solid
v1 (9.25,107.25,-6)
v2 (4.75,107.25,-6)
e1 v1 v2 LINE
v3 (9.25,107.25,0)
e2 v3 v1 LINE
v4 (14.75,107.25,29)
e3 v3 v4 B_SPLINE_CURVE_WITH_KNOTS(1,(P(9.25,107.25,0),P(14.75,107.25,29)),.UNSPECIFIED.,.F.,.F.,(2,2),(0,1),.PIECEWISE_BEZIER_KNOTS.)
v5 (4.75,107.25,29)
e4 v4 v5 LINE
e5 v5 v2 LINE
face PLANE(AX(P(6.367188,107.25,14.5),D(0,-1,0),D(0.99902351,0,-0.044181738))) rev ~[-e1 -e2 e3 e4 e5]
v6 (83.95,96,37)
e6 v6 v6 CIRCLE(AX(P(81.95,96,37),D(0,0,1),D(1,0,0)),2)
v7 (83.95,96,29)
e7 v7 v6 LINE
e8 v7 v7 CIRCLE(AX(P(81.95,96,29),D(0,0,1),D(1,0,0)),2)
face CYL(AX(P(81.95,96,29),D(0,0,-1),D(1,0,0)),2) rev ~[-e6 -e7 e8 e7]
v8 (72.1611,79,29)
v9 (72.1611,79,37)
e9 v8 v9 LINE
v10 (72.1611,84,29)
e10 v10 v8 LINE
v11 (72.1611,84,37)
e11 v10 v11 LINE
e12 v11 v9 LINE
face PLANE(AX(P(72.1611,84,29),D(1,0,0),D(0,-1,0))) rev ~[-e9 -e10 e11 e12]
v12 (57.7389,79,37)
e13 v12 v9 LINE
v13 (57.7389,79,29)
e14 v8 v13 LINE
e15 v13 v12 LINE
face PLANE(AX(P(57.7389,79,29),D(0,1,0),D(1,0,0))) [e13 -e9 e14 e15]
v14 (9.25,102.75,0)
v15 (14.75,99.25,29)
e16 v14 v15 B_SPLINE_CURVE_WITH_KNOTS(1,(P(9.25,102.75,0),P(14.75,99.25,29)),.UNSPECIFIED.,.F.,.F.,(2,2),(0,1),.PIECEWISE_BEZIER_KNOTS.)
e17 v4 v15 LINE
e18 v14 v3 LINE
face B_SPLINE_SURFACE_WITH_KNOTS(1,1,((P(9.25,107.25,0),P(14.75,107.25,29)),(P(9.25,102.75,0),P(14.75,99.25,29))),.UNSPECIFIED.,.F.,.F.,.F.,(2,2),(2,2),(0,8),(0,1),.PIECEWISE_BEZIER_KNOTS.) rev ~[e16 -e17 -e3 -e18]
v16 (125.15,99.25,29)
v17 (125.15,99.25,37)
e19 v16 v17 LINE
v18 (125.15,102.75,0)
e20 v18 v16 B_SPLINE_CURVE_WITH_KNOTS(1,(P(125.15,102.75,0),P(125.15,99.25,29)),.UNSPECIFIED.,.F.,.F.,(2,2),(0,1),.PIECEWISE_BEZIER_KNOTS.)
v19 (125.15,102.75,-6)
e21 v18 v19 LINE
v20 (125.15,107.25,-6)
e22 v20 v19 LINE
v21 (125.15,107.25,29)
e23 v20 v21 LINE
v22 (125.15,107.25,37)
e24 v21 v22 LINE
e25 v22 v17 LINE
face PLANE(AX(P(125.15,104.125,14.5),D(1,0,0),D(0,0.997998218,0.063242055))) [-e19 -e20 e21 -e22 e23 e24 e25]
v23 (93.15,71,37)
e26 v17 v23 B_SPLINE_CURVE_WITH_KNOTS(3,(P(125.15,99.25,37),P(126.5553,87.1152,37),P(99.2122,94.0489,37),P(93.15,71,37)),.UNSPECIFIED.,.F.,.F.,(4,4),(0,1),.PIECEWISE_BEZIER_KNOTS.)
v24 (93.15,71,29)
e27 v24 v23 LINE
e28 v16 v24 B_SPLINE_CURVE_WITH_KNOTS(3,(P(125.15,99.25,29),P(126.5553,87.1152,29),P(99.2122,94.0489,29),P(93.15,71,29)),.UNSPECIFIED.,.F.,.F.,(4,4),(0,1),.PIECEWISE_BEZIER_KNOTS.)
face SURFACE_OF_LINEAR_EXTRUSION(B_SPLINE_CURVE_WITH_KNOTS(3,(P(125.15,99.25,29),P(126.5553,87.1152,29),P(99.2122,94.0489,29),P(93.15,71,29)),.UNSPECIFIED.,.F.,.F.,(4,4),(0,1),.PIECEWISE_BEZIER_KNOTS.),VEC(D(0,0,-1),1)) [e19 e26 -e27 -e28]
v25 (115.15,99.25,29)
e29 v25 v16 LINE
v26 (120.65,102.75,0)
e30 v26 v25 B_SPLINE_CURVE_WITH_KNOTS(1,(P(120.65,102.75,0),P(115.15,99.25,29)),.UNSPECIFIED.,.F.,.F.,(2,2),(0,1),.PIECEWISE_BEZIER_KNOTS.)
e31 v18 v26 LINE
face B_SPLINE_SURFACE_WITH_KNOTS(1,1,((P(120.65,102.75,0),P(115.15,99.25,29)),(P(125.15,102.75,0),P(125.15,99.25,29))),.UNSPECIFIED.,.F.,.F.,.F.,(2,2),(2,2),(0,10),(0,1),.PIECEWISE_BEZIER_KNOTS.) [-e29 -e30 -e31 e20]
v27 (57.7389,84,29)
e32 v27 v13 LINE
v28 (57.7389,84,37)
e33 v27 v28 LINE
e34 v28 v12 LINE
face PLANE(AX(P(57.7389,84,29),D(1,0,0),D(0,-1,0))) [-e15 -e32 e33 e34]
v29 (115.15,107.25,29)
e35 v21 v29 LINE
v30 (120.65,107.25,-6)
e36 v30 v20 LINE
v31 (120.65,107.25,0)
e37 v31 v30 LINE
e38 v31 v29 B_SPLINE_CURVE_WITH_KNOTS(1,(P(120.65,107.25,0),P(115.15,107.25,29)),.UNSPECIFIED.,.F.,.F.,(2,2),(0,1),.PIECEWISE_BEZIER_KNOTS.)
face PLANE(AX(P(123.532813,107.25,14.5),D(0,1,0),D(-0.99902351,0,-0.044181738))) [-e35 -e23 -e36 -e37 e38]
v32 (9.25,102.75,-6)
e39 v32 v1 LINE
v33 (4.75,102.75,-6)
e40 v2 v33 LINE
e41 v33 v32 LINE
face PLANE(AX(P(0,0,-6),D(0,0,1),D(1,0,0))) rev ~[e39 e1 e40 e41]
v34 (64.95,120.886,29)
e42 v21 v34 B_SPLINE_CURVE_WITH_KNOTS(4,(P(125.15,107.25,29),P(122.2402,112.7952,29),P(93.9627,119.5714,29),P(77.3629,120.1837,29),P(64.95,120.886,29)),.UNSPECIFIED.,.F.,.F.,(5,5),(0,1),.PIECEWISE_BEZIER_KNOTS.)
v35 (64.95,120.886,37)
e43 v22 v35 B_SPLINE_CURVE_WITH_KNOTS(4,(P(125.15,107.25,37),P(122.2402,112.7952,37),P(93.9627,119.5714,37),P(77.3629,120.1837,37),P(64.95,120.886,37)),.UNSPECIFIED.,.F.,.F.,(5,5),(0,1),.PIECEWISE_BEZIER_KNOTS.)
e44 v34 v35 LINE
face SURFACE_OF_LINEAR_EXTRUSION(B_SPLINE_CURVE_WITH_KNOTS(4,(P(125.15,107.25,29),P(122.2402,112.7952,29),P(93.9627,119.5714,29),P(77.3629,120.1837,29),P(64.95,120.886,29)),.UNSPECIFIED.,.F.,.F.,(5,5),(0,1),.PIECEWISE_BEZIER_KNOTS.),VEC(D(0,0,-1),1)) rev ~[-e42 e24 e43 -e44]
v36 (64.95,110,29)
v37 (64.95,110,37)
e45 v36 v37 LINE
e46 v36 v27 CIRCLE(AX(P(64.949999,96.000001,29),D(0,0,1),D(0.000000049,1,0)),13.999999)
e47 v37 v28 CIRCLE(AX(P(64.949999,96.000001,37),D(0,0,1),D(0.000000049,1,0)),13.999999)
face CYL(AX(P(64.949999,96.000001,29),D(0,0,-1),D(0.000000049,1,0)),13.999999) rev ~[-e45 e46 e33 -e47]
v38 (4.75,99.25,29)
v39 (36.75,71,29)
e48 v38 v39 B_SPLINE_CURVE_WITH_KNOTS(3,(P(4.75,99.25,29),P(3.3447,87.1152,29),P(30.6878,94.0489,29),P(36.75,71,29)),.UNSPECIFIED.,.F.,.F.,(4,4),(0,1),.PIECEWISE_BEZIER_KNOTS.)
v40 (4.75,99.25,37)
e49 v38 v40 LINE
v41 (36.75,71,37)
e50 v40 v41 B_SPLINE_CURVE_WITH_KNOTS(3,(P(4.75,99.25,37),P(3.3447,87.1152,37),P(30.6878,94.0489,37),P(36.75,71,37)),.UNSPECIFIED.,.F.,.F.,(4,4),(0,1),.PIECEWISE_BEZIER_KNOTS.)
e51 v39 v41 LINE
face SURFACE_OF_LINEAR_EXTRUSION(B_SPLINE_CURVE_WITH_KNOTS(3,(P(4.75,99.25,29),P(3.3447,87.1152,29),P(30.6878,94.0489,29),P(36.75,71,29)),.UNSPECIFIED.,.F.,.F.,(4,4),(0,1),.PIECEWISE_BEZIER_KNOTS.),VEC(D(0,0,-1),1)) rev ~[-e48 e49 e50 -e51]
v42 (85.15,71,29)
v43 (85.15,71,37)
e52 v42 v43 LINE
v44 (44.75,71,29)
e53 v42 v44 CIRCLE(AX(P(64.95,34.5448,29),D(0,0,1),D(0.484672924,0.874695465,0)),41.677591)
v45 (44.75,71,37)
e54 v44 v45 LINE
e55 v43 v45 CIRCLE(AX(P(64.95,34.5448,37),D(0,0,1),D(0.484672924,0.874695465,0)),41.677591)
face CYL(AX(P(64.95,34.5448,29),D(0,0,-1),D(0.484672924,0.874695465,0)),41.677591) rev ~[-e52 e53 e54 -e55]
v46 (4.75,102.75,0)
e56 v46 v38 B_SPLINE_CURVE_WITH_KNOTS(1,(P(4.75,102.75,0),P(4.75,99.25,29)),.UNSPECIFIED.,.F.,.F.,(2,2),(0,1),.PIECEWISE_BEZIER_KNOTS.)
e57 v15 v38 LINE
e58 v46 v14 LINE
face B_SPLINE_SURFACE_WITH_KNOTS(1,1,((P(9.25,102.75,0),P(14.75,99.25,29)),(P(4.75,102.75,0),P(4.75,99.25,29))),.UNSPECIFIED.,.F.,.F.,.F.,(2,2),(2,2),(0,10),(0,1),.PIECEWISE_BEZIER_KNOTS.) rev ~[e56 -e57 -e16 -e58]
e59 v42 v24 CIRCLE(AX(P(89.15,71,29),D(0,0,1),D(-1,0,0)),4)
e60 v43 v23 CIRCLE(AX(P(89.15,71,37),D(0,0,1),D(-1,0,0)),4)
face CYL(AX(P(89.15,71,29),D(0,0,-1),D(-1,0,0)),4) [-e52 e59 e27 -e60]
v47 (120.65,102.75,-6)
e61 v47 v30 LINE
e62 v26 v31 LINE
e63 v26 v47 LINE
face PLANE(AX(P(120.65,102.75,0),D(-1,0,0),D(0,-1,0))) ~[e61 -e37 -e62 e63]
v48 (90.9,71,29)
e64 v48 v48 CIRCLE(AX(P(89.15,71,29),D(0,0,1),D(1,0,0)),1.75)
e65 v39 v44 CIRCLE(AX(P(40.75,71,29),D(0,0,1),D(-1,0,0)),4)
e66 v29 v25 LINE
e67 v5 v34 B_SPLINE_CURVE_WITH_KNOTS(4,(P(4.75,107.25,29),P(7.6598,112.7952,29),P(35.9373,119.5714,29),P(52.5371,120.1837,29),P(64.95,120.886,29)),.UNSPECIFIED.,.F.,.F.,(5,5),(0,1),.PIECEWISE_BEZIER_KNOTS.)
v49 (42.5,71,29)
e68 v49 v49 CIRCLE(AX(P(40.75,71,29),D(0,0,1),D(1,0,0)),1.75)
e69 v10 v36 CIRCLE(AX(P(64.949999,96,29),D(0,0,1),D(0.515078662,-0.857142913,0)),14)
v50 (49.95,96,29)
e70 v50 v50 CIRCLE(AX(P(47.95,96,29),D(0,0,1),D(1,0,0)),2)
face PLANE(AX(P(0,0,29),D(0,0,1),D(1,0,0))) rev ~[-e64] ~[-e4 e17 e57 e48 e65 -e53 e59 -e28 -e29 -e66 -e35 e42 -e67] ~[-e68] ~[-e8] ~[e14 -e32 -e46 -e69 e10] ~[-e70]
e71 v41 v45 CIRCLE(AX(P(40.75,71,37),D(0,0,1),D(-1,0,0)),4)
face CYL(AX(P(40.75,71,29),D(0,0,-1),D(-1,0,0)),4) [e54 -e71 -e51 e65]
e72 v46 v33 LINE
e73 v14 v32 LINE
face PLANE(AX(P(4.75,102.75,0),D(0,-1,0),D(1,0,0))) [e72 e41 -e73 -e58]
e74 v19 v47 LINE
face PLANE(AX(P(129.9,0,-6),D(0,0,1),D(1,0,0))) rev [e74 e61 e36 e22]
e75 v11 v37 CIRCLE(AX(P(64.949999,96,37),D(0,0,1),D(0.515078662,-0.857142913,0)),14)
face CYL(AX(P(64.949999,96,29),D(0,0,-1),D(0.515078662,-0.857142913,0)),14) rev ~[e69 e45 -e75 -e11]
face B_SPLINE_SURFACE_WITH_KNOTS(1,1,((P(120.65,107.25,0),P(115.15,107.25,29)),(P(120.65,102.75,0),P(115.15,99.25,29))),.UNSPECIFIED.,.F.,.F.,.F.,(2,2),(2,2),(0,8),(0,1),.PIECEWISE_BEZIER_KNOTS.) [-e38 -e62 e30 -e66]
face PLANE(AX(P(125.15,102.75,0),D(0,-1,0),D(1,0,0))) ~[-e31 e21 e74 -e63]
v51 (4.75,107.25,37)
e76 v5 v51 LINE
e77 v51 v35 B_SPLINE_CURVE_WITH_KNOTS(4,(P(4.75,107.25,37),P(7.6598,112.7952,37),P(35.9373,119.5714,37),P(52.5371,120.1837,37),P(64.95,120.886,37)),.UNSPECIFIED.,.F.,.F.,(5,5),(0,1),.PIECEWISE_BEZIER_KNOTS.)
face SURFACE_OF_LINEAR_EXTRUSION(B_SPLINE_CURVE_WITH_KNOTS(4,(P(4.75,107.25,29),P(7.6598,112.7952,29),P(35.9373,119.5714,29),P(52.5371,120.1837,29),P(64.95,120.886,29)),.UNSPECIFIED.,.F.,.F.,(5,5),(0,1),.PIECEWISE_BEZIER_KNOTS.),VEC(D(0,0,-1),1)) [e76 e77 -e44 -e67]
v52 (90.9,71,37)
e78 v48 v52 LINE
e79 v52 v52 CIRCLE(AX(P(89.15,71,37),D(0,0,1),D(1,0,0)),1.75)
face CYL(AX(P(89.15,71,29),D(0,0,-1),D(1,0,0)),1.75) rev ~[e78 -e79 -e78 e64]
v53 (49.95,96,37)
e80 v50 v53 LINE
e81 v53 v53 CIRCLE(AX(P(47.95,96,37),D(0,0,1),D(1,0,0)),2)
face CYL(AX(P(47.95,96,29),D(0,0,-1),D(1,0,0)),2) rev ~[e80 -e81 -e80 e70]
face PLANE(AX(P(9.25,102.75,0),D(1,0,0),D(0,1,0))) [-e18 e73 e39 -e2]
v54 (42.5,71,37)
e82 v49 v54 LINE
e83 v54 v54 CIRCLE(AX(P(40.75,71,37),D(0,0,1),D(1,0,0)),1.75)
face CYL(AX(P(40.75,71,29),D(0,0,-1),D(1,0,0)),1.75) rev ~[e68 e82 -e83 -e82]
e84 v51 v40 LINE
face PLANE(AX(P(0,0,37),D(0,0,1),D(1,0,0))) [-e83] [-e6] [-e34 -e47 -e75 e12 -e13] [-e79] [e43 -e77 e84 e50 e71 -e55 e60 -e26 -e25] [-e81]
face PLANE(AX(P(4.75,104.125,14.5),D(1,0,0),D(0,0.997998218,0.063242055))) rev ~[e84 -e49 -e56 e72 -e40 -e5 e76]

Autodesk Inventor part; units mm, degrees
ref_plane "XZ Plane" through (0, 0, 0) normal (0, 1, 0) x (-1, 0, 0)
sketch "Szkic2" plane through (0, 0, 0) normal (0, 0, 1) x (1, 0, 0)
  line L0 (4.75, 102.75) -> (9.25, 102.75)
  line L1 (9.25, 102.75) -> (9.25, 107.25)
  line L2 (9.25, 107.25) -> (4.75, 107.25)
  line L3 (4.75, 107.25) -> (4.75, 102.75)
  line L4 (4.75, 102.75) -> (9.25, 107.25) construction
  line L5 (9.25, 102.75) -> (4.75, 107.25) construction
  point P0 (0, 0)
  point P1 (64.95, 71.5)
  point P2 (7, 105)
  dimension "d1" = 4.5
  dimension "d2" = 4.5
ref_plane "Płaszczyzna konstrukcyjna1" through (64.95, 71.5, 0) normal (1, 0, 0) x (0, 1, 0)
ref_plane "Płaszczyzna konstrukcyjna2" through (0, 0, 29) normal (0, 0, 1) x (1, 0, 0)
sketch "Szkic3" plane through (0, 0, 29) normal (0, 0, 1) x (1, 0, 0)
  circle A0 centre (40.75, 71) radius 1.75 projected
  point P0 (0, 0)
extrude "Wyciągnięcie proste1" add sketch "Szkic2" against normal blind 6
sketch "Szkic4" plane through (0, 0, 0) normal (0, 0, 1) x (1, 0, 0)
  line L0 (4.75, 102.75) -> (9.25, 102.75) projected
  line L1 (9.25, 102.75) -> (9.25, 107.25) projected
  line L2 (9.25, 107.25) -> (4.75, 107.25) projected
  line L3 (4.75, 107.25) -> (4.75, 102.75) projected
  point P0 (0, 0)
sketch "Szkic5" plane through (0, 0, 29) normal (0, 0, 1) x (1, 0, 0)
  line L0 (64.95, 149.0685) -> (64.95, -24.8448) construction
  line L1 (64.95, 88) -> (64.95, 96) construction
  line L2 (64.95, 96) -> (47.95, 96) construction
  circle A0 centre (47.95, 96) radius 2
  line L3 (64.95, 96) -> (64.95, 84) construction
  line L4 (64.95, 84) -> (57.7389, 84) construction
  arc A1 (64.95, 110) -> (57.7389, 84) centre (64.95, 96) ccw
  line L5 (57.7389, 84) -> (57.7389, 79)
  line L6 (57.7389, 79) -> (64.95, 79)
  circle A2 centre (40.75, 71) radius 1.75 projected
  line L7 (64.95, 96) -> (81.95, 96) construction
  circle A3 centre (81.95, 96) radius 2
  line L8 (64.95, 84) -> (72.1611, 84) construction
  arc A4 (72.1611, 84) -> (64.95, 110) centre (64.95, 96) ccw
  line L9 (72.1611, 84) -> (72.1611, 79)
  line L10 (72.1611, 79) -> (64.95, 79)
  circle A5 centre (89.15, 71) radius 1.75
  arc A6 (36.75, 71) -> (44.75, 71) centre (40.75, 71) ccw
  arc A7 (85.15, 71) -> (93.15, 71) centre (89.15, 71) ccw
  arc A8 (85.15, 71) -> (44.75, 71) centre (64.95, 34.5448) ccw
  spline S0 degree 3 poles (4.75, 99.25) (3.3447, 87.1152) (30.6878, 94.0489) (36.75, 71) knots 0 0 0 0 1 1 1 1
  spline S1 degree 3 poles (125.15, 99.25) (126.5553, 87.1152) (99.2122, 94.0489) (93.15, 71) knots 0 0 0 0 1 1 1 1
  spline S2 degree 4 poles (4.75, 107.25) (7.6598, 112.7952) (35.9373, 119.5714) (52.5371, 120.1837) (64.95, 120.886) knots 0 0 0 0 0 1 1 1 1 1
  spline S3 degree 4 poles (125.15, 107.25) (122.2402, 112.7952) (93.9627, 119.5714) (77.3629, 120.1837) (64.95, 120.886) knots 0 0 0 0 0 1 1 1 1 1
  line L11 (125.15, 107.25) -> (125.15, 99.25)
  line L12 (4.75, 107.25) -> (4.75, 99.25)
  point P0 (0, 0)
  point P1 (50.95, 96)
  point P2 (78.95, 96)
  point P3 (7.7703, 93.2829)
  point P4 (21.1067, 88)
  point P5 (122.1297, 93.2829)
  point P6 (108.7933, 88)
  point P7 (10.3549, 111.0646)
  point P8 (29.8942, 116.7506)
  point P9 (51.4593, 119.9555)
  point P10 (119.5451, 111.0646)
  point P11 (100.0058, 116.7506)
  point P12 (78.4407, 119.9555)
  dimension "d7" = 17
  dimension "d8" = 4
  dimension "d9" = 12
  dimension "d10" = 5
  dimension "d13" = 4
  dimension "d14" = 8
extrude "Wyciągnięcie proste2" add sketch "Szkic5" along normal blind 8
sketch "Szkic6" plane through (0, 0, 29) normal (0, 0, -1) x (-1, 0, 0)
  line L0 (-9.25, 107.25) -> (-4.75, 107.25) projected
  line L1 (-4.75, 107.25) -> (-4.75, 99.25) projected
  line L2 (-4.75, 107.25) -> (-14.75, 107.25)
  line L3 (-14.75, 107.25) -> (-14.75, 99.25)
  line L4 (-14.75, 99.25) -> (-4.75, 99.25)
  line L5 (-4.75, 99.25) -> (-4.75, 107.25)
  line L6 (-64.95, -24.1772) -> (-64.95, 145.0632) construction
  point P0 (0, 0)
  point P1 (-125.15, 107.25)
  dimension "d19" = 10
  dimension "d20" = 8
sketch "Szkic7" plane through (0, 0, 0) normal (0, 0, 1) x (1, 0, 0)
  line L0 (4.75, 102.75) -> (9.25, 102.75) projected
  line L1 (9.25, 102.75) -> (9.25, 107.25) projected
  line L2 (9.25, 107.25) -> (4.75, 107.25) projected
  line L3 (4.75, 107.25) -> (4.75, 102.75) projected
  line L4 (4.75, 102.75) -> (9.25, 102.75) projected
  line L5 (4.75, 102.75) -> (9.25, 102.75)
  line L6 (9.25, 102.75) -> (9.25, 107.25)
  line L7 (9.25, 107.25) -> (4.75, 107.25)
  line L8 (4.75, 107.25) -> (4.75, 102.75)
  point P0 (0, 0)
  dimension "d21" = 4.5
  dimension "d22" = 4.5
loft "Wyciągnięcie złożone1" add profiles "Szkic6" section 1 edges at (7, 102.75, 0) (9.25, 105, 0) (7, 107.25, 0) (4.75, 105, 0)
mirror "Odbij1" about plane through (64.95, 71.5, 0) normal (1, 0, 0) of "Wyciągnięcie złożone1", "Wyciągnięcie proste1"
properties part number "turret_base"
